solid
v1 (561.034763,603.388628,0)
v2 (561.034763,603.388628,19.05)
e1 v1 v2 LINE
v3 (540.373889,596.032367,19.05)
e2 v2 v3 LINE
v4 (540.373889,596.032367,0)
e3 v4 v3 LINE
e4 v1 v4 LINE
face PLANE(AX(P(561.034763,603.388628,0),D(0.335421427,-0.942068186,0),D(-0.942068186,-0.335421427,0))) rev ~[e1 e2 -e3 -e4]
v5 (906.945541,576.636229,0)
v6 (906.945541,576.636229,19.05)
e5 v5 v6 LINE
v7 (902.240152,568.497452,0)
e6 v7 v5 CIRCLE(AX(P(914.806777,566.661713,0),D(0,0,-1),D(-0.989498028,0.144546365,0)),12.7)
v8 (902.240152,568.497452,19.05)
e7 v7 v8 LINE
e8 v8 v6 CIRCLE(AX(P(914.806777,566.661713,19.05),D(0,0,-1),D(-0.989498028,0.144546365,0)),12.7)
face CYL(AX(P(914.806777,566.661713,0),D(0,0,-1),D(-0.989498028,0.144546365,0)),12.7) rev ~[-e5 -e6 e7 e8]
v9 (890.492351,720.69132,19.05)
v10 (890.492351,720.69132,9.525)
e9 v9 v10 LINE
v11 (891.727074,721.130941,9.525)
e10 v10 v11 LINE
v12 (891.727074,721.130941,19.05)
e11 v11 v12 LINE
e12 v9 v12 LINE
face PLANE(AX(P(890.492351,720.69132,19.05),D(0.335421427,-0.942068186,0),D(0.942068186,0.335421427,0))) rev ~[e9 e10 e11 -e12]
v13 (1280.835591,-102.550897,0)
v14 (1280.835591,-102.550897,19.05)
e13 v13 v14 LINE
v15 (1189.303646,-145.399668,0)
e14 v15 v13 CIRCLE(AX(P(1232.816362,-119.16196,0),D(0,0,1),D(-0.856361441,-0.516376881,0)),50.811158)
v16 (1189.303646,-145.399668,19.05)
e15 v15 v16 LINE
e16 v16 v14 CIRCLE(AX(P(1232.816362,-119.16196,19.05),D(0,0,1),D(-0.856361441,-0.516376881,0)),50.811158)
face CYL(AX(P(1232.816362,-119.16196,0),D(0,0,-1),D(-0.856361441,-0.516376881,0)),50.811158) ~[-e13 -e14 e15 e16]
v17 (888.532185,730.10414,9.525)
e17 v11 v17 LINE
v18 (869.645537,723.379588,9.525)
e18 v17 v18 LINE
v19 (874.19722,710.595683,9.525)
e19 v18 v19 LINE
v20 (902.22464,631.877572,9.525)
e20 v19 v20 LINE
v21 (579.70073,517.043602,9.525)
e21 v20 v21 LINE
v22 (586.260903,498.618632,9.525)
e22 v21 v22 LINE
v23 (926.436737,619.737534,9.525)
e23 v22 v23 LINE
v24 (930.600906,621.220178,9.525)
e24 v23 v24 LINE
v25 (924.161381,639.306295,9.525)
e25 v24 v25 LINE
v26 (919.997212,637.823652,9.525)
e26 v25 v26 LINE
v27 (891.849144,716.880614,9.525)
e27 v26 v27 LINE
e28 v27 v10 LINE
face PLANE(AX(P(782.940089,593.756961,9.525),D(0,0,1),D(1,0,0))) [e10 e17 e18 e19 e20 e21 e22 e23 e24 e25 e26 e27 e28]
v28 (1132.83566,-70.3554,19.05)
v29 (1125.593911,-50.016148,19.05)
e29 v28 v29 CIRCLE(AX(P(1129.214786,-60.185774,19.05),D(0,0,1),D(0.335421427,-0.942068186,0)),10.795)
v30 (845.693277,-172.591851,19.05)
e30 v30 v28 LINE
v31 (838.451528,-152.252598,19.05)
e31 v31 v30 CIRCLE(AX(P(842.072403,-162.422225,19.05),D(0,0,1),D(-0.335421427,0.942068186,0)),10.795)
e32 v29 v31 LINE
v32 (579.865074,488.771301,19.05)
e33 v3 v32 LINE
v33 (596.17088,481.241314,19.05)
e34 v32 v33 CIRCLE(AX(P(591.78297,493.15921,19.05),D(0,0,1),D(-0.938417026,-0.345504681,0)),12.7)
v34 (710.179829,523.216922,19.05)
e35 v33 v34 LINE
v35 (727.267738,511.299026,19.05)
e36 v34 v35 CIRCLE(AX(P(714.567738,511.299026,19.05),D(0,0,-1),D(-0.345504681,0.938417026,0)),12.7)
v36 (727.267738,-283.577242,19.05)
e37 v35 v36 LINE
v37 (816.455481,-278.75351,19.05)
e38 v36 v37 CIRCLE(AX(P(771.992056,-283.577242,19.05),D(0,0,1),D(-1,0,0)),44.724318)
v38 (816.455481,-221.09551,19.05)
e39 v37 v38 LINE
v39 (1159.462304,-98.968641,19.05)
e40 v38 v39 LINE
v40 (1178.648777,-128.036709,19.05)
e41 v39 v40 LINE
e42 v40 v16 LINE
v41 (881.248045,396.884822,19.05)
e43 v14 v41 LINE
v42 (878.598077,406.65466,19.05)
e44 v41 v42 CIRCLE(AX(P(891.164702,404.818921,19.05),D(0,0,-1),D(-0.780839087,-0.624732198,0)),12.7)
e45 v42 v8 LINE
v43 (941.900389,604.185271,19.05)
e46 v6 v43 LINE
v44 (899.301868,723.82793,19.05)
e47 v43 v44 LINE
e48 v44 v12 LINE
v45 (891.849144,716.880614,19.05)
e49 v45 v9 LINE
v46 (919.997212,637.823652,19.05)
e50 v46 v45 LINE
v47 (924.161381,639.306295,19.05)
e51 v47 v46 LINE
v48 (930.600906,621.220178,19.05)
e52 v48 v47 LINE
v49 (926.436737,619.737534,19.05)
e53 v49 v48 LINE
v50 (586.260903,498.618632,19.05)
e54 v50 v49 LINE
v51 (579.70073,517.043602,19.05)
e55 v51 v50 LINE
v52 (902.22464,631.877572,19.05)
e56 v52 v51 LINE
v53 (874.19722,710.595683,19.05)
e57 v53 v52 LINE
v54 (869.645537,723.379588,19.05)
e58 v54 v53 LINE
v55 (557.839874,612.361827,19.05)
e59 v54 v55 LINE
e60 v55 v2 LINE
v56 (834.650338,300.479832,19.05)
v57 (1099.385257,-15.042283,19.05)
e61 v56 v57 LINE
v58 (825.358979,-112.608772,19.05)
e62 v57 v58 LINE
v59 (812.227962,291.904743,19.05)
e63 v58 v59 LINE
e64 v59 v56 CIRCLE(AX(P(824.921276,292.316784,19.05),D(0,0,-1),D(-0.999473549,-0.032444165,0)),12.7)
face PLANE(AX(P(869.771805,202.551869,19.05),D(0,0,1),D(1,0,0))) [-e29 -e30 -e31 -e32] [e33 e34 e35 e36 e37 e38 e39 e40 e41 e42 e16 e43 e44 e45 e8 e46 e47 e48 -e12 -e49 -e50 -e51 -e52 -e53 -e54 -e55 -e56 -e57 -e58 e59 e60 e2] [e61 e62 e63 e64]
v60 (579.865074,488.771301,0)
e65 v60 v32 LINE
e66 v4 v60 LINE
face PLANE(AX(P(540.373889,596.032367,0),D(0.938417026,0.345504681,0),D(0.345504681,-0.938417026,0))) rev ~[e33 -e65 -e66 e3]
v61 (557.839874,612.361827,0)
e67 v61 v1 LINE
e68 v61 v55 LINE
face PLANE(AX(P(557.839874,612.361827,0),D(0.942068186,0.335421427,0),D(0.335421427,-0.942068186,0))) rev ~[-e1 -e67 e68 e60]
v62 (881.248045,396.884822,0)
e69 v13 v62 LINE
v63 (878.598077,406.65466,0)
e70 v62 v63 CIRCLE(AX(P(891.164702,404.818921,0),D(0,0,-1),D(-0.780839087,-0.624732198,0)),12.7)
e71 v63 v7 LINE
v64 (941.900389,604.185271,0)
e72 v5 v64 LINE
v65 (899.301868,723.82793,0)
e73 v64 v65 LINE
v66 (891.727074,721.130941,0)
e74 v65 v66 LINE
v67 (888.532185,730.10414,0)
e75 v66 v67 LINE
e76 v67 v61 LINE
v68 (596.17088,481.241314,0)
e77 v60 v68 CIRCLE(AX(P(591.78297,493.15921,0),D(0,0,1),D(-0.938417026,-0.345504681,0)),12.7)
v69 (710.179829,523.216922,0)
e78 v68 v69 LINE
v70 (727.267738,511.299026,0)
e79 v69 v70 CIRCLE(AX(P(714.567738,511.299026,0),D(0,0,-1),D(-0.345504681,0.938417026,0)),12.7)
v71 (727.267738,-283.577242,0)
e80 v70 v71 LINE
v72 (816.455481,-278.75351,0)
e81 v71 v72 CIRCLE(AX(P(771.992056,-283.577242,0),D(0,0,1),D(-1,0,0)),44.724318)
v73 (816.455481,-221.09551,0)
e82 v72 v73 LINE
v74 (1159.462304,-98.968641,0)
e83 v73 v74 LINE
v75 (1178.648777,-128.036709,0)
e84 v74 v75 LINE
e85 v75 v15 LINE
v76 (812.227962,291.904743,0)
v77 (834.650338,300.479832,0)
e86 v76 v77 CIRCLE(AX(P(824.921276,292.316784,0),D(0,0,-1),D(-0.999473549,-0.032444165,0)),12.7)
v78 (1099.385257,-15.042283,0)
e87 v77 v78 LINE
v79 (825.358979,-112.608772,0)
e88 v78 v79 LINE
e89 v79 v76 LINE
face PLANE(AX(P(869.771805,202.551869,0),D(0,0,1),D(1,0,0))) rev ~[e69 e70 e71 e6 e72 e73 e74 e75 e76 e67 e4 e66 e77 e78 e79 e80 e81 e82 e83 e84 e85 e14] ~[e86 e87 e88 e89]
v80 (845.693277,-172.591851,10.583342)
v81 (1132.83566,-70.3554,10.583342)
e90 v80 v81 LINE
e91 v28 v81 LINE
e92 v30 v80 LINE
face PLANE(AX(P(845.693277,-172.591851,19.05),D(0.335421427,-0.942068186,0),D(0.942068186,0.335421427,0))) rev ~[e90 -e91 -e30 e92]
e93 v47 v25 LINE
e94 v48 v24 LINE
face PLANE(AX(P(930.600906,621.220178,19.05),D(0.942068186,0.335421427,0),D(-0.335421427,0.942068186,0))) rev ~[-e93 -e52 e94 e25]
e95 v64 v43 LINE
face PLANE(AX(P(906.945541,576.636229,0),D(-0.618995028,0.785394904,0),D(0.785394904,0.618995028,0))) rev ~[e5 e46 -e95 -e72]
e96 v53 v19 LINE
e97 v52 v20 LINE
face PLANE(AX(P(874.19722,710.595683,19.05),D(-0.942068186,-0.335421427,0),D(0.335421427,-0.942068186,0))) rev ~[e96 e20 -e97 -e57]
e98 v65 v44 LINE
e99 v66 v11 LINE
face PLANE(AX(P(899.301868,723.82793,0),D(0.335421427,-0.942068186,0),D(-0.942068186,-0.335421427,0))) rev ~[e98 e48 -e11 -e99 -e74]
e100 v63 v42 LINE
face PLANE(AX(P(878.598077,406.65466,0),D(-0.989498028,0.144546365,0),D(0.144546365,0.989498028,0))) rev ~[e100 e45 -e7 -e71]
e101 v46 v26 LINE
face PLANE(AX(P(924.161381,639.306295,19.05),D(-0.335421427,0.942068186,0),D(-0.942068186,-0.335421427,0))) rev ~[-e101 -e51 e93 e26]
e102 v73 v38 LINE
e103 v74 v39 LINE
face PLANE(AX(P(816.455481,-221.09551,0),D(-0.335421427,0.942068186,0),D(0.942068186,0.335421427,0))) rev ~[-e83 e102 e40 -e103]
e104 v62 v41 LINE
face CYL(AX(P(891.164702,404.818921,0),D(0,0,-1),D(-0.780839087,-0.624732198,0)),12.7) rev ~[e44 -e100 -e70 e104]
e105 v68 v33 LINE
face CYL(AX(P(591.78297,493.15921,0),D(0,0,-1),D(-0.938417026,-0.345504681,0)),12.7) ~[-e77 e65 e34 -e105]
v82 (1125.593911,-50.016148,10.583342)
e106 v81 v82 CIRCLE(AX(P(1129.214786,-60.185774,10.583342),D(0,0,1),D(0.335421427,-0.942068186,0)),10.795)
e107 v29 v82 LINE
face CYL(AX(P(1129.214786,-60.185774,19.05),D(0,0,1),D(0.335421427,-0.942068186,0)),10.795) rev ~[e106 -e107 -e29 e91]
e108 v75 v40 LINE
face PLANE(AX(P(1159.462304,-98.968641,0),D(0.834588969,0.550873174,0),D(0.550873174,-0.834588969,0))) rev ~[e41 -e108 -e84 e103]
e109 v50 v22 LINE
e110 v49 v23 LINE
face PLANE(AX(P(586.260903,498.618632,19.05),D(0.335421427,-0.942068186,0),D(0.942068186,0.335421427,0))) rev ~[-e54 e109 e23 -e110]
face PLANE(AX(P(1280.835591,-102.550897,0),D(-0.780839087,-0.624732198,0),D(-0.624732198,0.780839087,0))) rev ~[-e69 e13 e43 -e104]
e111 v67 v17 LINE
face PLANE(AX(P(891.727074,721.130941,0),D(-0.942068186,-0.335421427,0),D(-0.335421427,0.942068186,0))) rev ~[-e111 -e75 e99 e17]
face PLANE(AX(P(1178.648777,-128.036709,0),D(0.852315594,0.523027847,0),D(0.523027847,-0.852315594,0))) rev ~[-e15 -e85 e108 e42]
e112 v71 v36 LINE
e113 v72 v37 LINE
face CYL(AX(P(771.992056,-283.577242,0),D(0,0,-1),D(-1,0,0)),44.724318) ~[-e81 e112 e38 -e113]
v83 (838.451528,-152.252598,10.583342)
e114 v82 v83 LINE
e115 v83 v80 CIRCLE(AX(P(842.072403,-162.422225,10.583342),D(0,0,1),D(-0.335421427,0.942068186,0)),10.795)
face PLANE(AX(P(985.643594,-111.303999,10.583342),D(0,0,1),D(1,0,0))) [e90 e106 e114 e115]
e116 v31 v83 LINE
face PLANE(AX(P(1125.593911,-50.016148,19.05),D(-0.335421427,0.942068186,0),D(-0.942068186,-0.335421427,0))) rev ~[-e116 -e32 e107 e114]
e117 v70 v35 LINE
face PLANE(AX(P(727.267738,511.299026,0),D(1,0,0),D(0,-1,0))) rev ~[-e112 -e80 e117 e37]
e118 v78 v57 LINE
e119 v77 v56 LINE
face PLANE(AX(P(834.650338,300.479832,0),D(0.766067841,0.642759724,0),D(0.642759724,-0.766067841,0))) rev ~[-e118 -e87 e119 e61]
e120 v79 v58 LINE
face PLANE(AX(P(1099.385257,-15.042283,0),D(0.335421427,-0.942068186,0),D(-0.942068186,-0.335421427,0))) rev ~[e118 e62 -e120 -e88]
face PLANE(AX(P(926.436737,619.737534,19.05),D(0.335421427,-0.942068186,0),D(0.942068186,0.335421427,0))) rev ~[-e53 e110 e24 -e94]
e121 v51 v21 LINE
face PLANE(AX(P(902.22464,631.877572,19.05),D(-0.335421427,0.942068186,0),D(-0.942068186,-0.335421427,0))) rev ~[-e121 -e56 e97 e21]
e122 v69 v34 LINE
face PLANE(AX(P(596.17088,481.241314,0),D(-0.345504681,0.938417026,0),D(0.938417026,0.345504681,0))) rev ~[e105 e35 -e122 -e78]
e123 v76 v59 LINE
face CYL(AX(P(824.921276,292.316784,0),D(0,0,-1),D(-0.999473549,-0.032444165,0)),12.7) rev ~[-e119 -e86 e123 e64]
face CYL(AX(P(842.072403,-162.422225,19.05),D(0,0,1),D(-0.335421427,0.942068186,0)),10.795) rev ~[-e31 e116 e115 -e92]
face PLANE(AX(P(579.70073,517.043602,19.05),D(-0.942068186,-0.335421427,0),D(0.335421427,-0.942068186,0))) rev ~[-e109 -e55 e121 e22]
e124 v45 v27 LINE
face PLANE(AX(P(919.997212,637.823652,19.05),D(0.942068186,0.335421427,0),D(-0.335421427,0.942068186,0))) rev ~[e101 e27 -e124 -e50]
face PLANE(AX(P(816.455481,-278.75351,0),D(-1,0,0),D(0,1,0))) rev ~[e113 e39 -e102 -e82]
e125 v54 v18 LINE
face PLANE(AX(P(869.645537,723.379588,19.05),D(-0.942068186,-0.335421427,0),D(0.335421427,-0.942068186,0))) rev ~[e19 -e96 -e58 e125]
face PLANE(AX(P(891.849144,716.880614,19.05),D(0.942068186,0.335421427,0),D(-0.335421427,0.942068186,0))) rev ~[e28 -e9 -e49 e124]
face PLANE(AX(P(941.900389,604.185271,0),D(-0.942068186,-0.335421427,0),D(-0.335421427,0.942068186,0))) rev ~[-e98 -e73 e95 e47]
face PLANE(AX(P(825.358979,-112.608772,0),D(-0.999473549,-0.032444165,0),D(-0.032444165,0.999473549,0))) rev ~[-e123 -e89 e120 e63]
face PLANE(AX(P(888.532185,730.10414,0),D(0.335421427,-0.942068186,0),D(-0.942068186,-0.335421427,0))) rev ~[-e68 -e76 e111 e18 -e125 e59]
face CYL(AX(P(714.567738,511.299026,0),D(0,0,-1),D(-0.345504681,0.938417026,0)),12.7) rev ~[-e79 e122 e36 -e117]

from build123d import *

# Parameters (mm, degrees)
F1_DEPTH = 19.05
F3_DEPTH = 8.4666582
F5_DEPTH = 9.525


# Not quite as in the source:
# - a feature names something its author has since deleted; it is built from what else it names


with BuildPart() as f1:
    # F0 (on Top) → F1 (new body)
    with BuildSketch(Plane.XY):
        with BuildLine():
            Line((727.2677384075, 427.9083177516), (727.2677384075, -283.5772421425))
            ThreePointArc((727.2677384075, -283.5772421425), (774.4074471785, -328.2362889839), (816.4554812019, -278.7535097314))
            Line((816.4554812019, -278.7535097314), (816.4554812019, -221.0955097314))
            Line((816.4554812019, -221.0955097314), (1159.4623036636, -98.9686407408))
            Line((1159.4623036636, -98.9686407408), (1178.6487772739, -128.0367093729))
            Line((1178.6487772739, -128.0367093729), (1189.3036458742, -145.3996676047))
            ThreePointArc((1189.3036458742, -145.3996676047), (1254.3589120262, -165.180351508), (1280.8355912672, -102.5508970465))
            Line((1280.8355912672, -102.5508970465), (881.2480453078, 396.8848219998))
            ThreePointArc((881.2480453078, 396.8848219998), (878.9075846932, 401.4943033077), (878.5980767553, 406.6546597539))
            Line((878.5980767553, 406.6546597539), (902.2401524871, 568.497452094))
            ThreePointArc((902.2401524871, 568.497452094), (903.8120375637, 573.0182606597), (906.9455405898, 576.6362285378))
            Line((906.9455405898, 576.6362285378), (941.9003890149, 604.1852707886))
            Line((941.9003890149, 604.1852707886), (899.3018677789, 723.8279303566))
            Line((899.3018677789, 723.8279303566), (891.7270738587, 721.1309406639))
            Line((891.7270738587, 721.1309406639), (888.532184766, 730.1041401315))
            Line((888.532184766, 730.1041401315), (557.8398737201, 612.361827435))
            Line((557.8398737201, 612.361827435), (561.0347628128, 603.3886279674))
            Line((561.0347628128, 603.3886279674), (540.3738890749, 596.0323666485))
            Line((540.3738890749, 596.0323666485), (579.8650741531, 488.7713005475))
            ThreePointArc((579.8650741531, 488.7713005475), (586.4584656719, 481.6292642269), (596.1708798397, 481.2413137672))
            Line((596.1708798397, 481.2413137672), (710.1798289544, 523.2169221936))
            ThreePointArc((710.1798289544, 523.2169221936), (721.8328450807, 521.7157540947), (727.2677384075, 511.2990259602))
            Line((727.2677384075, 511.2990259602), (727.2677384075, 427.9083177516))
        make_face()
        with BuildLine():
            Line((1099.3852571882, -15.0422832395), (825.3589785984, -112.6087723988))
            Line((825.3589785984, -112.6087723988), (812.2279623998, 291.9047427935))
            ThreePointArc((812.2279623998, 291.9047427935), (820.3847868922, 304.1789193457), (834.6503380579, 300.4798321914))
            Line((834.6503380579, 300.4798321914), (1099.3852571882, -15.0422832395))
        make_face(mode=Mode.SUBTRACT)
    extrude(amount=F1_DEPTH)

    # F2 (on face) → F3 (cut)
    with BuildSketch(Plane.XY.offset(19.05)):
        with BuildLine():
            ThreePointArc((838.451528287, -152.2525984903), (831.9027765287, -166.0430988586), (845.6932768971, -172.5918506169))
            Line((845.6932768971, -172.5918506169), (1132.8356598603, -70.3553996504))
            ThreePointArc((1132.8356598603, -70.3553996504), (1139.3844116185, -56.564899282), (1125.5939112501, -50.0161475238))
            Line((1125.5939112501, -50.0161475238), (838.451528287, -152.2525984903))
        make_face()
    extrude(amount=-F3_DEPTH, mode=Mode.SUBTRACT)

    # F4 (on face) → F5 (cut)
    with BuildSketch(Plane.XY.offset(19.05)):
        Polygon((579.7007303012, 517.0436017545), (586.2609025716, 498.618632181), (926.4367371726, 619.7375338049), (930.6009060633, 621.2201775171), (924.161381266, 639.3062953154), (919.9972123753, 637.8236516032), (891.8491444715, 716.8806143331), (890.4923506062, 720.6913200061), (891.7270738587, 721.1309406639), (888.532184766, 730.1041401315), (869.645537074, 723.3795883228), (874.197220032, 710.5956831823), (902.2246404628, 631.8775722275), align=None)
    extrude(amount=-F5_DEPTH, mode=Mode.SUBTRACT)


solid = f1.part
